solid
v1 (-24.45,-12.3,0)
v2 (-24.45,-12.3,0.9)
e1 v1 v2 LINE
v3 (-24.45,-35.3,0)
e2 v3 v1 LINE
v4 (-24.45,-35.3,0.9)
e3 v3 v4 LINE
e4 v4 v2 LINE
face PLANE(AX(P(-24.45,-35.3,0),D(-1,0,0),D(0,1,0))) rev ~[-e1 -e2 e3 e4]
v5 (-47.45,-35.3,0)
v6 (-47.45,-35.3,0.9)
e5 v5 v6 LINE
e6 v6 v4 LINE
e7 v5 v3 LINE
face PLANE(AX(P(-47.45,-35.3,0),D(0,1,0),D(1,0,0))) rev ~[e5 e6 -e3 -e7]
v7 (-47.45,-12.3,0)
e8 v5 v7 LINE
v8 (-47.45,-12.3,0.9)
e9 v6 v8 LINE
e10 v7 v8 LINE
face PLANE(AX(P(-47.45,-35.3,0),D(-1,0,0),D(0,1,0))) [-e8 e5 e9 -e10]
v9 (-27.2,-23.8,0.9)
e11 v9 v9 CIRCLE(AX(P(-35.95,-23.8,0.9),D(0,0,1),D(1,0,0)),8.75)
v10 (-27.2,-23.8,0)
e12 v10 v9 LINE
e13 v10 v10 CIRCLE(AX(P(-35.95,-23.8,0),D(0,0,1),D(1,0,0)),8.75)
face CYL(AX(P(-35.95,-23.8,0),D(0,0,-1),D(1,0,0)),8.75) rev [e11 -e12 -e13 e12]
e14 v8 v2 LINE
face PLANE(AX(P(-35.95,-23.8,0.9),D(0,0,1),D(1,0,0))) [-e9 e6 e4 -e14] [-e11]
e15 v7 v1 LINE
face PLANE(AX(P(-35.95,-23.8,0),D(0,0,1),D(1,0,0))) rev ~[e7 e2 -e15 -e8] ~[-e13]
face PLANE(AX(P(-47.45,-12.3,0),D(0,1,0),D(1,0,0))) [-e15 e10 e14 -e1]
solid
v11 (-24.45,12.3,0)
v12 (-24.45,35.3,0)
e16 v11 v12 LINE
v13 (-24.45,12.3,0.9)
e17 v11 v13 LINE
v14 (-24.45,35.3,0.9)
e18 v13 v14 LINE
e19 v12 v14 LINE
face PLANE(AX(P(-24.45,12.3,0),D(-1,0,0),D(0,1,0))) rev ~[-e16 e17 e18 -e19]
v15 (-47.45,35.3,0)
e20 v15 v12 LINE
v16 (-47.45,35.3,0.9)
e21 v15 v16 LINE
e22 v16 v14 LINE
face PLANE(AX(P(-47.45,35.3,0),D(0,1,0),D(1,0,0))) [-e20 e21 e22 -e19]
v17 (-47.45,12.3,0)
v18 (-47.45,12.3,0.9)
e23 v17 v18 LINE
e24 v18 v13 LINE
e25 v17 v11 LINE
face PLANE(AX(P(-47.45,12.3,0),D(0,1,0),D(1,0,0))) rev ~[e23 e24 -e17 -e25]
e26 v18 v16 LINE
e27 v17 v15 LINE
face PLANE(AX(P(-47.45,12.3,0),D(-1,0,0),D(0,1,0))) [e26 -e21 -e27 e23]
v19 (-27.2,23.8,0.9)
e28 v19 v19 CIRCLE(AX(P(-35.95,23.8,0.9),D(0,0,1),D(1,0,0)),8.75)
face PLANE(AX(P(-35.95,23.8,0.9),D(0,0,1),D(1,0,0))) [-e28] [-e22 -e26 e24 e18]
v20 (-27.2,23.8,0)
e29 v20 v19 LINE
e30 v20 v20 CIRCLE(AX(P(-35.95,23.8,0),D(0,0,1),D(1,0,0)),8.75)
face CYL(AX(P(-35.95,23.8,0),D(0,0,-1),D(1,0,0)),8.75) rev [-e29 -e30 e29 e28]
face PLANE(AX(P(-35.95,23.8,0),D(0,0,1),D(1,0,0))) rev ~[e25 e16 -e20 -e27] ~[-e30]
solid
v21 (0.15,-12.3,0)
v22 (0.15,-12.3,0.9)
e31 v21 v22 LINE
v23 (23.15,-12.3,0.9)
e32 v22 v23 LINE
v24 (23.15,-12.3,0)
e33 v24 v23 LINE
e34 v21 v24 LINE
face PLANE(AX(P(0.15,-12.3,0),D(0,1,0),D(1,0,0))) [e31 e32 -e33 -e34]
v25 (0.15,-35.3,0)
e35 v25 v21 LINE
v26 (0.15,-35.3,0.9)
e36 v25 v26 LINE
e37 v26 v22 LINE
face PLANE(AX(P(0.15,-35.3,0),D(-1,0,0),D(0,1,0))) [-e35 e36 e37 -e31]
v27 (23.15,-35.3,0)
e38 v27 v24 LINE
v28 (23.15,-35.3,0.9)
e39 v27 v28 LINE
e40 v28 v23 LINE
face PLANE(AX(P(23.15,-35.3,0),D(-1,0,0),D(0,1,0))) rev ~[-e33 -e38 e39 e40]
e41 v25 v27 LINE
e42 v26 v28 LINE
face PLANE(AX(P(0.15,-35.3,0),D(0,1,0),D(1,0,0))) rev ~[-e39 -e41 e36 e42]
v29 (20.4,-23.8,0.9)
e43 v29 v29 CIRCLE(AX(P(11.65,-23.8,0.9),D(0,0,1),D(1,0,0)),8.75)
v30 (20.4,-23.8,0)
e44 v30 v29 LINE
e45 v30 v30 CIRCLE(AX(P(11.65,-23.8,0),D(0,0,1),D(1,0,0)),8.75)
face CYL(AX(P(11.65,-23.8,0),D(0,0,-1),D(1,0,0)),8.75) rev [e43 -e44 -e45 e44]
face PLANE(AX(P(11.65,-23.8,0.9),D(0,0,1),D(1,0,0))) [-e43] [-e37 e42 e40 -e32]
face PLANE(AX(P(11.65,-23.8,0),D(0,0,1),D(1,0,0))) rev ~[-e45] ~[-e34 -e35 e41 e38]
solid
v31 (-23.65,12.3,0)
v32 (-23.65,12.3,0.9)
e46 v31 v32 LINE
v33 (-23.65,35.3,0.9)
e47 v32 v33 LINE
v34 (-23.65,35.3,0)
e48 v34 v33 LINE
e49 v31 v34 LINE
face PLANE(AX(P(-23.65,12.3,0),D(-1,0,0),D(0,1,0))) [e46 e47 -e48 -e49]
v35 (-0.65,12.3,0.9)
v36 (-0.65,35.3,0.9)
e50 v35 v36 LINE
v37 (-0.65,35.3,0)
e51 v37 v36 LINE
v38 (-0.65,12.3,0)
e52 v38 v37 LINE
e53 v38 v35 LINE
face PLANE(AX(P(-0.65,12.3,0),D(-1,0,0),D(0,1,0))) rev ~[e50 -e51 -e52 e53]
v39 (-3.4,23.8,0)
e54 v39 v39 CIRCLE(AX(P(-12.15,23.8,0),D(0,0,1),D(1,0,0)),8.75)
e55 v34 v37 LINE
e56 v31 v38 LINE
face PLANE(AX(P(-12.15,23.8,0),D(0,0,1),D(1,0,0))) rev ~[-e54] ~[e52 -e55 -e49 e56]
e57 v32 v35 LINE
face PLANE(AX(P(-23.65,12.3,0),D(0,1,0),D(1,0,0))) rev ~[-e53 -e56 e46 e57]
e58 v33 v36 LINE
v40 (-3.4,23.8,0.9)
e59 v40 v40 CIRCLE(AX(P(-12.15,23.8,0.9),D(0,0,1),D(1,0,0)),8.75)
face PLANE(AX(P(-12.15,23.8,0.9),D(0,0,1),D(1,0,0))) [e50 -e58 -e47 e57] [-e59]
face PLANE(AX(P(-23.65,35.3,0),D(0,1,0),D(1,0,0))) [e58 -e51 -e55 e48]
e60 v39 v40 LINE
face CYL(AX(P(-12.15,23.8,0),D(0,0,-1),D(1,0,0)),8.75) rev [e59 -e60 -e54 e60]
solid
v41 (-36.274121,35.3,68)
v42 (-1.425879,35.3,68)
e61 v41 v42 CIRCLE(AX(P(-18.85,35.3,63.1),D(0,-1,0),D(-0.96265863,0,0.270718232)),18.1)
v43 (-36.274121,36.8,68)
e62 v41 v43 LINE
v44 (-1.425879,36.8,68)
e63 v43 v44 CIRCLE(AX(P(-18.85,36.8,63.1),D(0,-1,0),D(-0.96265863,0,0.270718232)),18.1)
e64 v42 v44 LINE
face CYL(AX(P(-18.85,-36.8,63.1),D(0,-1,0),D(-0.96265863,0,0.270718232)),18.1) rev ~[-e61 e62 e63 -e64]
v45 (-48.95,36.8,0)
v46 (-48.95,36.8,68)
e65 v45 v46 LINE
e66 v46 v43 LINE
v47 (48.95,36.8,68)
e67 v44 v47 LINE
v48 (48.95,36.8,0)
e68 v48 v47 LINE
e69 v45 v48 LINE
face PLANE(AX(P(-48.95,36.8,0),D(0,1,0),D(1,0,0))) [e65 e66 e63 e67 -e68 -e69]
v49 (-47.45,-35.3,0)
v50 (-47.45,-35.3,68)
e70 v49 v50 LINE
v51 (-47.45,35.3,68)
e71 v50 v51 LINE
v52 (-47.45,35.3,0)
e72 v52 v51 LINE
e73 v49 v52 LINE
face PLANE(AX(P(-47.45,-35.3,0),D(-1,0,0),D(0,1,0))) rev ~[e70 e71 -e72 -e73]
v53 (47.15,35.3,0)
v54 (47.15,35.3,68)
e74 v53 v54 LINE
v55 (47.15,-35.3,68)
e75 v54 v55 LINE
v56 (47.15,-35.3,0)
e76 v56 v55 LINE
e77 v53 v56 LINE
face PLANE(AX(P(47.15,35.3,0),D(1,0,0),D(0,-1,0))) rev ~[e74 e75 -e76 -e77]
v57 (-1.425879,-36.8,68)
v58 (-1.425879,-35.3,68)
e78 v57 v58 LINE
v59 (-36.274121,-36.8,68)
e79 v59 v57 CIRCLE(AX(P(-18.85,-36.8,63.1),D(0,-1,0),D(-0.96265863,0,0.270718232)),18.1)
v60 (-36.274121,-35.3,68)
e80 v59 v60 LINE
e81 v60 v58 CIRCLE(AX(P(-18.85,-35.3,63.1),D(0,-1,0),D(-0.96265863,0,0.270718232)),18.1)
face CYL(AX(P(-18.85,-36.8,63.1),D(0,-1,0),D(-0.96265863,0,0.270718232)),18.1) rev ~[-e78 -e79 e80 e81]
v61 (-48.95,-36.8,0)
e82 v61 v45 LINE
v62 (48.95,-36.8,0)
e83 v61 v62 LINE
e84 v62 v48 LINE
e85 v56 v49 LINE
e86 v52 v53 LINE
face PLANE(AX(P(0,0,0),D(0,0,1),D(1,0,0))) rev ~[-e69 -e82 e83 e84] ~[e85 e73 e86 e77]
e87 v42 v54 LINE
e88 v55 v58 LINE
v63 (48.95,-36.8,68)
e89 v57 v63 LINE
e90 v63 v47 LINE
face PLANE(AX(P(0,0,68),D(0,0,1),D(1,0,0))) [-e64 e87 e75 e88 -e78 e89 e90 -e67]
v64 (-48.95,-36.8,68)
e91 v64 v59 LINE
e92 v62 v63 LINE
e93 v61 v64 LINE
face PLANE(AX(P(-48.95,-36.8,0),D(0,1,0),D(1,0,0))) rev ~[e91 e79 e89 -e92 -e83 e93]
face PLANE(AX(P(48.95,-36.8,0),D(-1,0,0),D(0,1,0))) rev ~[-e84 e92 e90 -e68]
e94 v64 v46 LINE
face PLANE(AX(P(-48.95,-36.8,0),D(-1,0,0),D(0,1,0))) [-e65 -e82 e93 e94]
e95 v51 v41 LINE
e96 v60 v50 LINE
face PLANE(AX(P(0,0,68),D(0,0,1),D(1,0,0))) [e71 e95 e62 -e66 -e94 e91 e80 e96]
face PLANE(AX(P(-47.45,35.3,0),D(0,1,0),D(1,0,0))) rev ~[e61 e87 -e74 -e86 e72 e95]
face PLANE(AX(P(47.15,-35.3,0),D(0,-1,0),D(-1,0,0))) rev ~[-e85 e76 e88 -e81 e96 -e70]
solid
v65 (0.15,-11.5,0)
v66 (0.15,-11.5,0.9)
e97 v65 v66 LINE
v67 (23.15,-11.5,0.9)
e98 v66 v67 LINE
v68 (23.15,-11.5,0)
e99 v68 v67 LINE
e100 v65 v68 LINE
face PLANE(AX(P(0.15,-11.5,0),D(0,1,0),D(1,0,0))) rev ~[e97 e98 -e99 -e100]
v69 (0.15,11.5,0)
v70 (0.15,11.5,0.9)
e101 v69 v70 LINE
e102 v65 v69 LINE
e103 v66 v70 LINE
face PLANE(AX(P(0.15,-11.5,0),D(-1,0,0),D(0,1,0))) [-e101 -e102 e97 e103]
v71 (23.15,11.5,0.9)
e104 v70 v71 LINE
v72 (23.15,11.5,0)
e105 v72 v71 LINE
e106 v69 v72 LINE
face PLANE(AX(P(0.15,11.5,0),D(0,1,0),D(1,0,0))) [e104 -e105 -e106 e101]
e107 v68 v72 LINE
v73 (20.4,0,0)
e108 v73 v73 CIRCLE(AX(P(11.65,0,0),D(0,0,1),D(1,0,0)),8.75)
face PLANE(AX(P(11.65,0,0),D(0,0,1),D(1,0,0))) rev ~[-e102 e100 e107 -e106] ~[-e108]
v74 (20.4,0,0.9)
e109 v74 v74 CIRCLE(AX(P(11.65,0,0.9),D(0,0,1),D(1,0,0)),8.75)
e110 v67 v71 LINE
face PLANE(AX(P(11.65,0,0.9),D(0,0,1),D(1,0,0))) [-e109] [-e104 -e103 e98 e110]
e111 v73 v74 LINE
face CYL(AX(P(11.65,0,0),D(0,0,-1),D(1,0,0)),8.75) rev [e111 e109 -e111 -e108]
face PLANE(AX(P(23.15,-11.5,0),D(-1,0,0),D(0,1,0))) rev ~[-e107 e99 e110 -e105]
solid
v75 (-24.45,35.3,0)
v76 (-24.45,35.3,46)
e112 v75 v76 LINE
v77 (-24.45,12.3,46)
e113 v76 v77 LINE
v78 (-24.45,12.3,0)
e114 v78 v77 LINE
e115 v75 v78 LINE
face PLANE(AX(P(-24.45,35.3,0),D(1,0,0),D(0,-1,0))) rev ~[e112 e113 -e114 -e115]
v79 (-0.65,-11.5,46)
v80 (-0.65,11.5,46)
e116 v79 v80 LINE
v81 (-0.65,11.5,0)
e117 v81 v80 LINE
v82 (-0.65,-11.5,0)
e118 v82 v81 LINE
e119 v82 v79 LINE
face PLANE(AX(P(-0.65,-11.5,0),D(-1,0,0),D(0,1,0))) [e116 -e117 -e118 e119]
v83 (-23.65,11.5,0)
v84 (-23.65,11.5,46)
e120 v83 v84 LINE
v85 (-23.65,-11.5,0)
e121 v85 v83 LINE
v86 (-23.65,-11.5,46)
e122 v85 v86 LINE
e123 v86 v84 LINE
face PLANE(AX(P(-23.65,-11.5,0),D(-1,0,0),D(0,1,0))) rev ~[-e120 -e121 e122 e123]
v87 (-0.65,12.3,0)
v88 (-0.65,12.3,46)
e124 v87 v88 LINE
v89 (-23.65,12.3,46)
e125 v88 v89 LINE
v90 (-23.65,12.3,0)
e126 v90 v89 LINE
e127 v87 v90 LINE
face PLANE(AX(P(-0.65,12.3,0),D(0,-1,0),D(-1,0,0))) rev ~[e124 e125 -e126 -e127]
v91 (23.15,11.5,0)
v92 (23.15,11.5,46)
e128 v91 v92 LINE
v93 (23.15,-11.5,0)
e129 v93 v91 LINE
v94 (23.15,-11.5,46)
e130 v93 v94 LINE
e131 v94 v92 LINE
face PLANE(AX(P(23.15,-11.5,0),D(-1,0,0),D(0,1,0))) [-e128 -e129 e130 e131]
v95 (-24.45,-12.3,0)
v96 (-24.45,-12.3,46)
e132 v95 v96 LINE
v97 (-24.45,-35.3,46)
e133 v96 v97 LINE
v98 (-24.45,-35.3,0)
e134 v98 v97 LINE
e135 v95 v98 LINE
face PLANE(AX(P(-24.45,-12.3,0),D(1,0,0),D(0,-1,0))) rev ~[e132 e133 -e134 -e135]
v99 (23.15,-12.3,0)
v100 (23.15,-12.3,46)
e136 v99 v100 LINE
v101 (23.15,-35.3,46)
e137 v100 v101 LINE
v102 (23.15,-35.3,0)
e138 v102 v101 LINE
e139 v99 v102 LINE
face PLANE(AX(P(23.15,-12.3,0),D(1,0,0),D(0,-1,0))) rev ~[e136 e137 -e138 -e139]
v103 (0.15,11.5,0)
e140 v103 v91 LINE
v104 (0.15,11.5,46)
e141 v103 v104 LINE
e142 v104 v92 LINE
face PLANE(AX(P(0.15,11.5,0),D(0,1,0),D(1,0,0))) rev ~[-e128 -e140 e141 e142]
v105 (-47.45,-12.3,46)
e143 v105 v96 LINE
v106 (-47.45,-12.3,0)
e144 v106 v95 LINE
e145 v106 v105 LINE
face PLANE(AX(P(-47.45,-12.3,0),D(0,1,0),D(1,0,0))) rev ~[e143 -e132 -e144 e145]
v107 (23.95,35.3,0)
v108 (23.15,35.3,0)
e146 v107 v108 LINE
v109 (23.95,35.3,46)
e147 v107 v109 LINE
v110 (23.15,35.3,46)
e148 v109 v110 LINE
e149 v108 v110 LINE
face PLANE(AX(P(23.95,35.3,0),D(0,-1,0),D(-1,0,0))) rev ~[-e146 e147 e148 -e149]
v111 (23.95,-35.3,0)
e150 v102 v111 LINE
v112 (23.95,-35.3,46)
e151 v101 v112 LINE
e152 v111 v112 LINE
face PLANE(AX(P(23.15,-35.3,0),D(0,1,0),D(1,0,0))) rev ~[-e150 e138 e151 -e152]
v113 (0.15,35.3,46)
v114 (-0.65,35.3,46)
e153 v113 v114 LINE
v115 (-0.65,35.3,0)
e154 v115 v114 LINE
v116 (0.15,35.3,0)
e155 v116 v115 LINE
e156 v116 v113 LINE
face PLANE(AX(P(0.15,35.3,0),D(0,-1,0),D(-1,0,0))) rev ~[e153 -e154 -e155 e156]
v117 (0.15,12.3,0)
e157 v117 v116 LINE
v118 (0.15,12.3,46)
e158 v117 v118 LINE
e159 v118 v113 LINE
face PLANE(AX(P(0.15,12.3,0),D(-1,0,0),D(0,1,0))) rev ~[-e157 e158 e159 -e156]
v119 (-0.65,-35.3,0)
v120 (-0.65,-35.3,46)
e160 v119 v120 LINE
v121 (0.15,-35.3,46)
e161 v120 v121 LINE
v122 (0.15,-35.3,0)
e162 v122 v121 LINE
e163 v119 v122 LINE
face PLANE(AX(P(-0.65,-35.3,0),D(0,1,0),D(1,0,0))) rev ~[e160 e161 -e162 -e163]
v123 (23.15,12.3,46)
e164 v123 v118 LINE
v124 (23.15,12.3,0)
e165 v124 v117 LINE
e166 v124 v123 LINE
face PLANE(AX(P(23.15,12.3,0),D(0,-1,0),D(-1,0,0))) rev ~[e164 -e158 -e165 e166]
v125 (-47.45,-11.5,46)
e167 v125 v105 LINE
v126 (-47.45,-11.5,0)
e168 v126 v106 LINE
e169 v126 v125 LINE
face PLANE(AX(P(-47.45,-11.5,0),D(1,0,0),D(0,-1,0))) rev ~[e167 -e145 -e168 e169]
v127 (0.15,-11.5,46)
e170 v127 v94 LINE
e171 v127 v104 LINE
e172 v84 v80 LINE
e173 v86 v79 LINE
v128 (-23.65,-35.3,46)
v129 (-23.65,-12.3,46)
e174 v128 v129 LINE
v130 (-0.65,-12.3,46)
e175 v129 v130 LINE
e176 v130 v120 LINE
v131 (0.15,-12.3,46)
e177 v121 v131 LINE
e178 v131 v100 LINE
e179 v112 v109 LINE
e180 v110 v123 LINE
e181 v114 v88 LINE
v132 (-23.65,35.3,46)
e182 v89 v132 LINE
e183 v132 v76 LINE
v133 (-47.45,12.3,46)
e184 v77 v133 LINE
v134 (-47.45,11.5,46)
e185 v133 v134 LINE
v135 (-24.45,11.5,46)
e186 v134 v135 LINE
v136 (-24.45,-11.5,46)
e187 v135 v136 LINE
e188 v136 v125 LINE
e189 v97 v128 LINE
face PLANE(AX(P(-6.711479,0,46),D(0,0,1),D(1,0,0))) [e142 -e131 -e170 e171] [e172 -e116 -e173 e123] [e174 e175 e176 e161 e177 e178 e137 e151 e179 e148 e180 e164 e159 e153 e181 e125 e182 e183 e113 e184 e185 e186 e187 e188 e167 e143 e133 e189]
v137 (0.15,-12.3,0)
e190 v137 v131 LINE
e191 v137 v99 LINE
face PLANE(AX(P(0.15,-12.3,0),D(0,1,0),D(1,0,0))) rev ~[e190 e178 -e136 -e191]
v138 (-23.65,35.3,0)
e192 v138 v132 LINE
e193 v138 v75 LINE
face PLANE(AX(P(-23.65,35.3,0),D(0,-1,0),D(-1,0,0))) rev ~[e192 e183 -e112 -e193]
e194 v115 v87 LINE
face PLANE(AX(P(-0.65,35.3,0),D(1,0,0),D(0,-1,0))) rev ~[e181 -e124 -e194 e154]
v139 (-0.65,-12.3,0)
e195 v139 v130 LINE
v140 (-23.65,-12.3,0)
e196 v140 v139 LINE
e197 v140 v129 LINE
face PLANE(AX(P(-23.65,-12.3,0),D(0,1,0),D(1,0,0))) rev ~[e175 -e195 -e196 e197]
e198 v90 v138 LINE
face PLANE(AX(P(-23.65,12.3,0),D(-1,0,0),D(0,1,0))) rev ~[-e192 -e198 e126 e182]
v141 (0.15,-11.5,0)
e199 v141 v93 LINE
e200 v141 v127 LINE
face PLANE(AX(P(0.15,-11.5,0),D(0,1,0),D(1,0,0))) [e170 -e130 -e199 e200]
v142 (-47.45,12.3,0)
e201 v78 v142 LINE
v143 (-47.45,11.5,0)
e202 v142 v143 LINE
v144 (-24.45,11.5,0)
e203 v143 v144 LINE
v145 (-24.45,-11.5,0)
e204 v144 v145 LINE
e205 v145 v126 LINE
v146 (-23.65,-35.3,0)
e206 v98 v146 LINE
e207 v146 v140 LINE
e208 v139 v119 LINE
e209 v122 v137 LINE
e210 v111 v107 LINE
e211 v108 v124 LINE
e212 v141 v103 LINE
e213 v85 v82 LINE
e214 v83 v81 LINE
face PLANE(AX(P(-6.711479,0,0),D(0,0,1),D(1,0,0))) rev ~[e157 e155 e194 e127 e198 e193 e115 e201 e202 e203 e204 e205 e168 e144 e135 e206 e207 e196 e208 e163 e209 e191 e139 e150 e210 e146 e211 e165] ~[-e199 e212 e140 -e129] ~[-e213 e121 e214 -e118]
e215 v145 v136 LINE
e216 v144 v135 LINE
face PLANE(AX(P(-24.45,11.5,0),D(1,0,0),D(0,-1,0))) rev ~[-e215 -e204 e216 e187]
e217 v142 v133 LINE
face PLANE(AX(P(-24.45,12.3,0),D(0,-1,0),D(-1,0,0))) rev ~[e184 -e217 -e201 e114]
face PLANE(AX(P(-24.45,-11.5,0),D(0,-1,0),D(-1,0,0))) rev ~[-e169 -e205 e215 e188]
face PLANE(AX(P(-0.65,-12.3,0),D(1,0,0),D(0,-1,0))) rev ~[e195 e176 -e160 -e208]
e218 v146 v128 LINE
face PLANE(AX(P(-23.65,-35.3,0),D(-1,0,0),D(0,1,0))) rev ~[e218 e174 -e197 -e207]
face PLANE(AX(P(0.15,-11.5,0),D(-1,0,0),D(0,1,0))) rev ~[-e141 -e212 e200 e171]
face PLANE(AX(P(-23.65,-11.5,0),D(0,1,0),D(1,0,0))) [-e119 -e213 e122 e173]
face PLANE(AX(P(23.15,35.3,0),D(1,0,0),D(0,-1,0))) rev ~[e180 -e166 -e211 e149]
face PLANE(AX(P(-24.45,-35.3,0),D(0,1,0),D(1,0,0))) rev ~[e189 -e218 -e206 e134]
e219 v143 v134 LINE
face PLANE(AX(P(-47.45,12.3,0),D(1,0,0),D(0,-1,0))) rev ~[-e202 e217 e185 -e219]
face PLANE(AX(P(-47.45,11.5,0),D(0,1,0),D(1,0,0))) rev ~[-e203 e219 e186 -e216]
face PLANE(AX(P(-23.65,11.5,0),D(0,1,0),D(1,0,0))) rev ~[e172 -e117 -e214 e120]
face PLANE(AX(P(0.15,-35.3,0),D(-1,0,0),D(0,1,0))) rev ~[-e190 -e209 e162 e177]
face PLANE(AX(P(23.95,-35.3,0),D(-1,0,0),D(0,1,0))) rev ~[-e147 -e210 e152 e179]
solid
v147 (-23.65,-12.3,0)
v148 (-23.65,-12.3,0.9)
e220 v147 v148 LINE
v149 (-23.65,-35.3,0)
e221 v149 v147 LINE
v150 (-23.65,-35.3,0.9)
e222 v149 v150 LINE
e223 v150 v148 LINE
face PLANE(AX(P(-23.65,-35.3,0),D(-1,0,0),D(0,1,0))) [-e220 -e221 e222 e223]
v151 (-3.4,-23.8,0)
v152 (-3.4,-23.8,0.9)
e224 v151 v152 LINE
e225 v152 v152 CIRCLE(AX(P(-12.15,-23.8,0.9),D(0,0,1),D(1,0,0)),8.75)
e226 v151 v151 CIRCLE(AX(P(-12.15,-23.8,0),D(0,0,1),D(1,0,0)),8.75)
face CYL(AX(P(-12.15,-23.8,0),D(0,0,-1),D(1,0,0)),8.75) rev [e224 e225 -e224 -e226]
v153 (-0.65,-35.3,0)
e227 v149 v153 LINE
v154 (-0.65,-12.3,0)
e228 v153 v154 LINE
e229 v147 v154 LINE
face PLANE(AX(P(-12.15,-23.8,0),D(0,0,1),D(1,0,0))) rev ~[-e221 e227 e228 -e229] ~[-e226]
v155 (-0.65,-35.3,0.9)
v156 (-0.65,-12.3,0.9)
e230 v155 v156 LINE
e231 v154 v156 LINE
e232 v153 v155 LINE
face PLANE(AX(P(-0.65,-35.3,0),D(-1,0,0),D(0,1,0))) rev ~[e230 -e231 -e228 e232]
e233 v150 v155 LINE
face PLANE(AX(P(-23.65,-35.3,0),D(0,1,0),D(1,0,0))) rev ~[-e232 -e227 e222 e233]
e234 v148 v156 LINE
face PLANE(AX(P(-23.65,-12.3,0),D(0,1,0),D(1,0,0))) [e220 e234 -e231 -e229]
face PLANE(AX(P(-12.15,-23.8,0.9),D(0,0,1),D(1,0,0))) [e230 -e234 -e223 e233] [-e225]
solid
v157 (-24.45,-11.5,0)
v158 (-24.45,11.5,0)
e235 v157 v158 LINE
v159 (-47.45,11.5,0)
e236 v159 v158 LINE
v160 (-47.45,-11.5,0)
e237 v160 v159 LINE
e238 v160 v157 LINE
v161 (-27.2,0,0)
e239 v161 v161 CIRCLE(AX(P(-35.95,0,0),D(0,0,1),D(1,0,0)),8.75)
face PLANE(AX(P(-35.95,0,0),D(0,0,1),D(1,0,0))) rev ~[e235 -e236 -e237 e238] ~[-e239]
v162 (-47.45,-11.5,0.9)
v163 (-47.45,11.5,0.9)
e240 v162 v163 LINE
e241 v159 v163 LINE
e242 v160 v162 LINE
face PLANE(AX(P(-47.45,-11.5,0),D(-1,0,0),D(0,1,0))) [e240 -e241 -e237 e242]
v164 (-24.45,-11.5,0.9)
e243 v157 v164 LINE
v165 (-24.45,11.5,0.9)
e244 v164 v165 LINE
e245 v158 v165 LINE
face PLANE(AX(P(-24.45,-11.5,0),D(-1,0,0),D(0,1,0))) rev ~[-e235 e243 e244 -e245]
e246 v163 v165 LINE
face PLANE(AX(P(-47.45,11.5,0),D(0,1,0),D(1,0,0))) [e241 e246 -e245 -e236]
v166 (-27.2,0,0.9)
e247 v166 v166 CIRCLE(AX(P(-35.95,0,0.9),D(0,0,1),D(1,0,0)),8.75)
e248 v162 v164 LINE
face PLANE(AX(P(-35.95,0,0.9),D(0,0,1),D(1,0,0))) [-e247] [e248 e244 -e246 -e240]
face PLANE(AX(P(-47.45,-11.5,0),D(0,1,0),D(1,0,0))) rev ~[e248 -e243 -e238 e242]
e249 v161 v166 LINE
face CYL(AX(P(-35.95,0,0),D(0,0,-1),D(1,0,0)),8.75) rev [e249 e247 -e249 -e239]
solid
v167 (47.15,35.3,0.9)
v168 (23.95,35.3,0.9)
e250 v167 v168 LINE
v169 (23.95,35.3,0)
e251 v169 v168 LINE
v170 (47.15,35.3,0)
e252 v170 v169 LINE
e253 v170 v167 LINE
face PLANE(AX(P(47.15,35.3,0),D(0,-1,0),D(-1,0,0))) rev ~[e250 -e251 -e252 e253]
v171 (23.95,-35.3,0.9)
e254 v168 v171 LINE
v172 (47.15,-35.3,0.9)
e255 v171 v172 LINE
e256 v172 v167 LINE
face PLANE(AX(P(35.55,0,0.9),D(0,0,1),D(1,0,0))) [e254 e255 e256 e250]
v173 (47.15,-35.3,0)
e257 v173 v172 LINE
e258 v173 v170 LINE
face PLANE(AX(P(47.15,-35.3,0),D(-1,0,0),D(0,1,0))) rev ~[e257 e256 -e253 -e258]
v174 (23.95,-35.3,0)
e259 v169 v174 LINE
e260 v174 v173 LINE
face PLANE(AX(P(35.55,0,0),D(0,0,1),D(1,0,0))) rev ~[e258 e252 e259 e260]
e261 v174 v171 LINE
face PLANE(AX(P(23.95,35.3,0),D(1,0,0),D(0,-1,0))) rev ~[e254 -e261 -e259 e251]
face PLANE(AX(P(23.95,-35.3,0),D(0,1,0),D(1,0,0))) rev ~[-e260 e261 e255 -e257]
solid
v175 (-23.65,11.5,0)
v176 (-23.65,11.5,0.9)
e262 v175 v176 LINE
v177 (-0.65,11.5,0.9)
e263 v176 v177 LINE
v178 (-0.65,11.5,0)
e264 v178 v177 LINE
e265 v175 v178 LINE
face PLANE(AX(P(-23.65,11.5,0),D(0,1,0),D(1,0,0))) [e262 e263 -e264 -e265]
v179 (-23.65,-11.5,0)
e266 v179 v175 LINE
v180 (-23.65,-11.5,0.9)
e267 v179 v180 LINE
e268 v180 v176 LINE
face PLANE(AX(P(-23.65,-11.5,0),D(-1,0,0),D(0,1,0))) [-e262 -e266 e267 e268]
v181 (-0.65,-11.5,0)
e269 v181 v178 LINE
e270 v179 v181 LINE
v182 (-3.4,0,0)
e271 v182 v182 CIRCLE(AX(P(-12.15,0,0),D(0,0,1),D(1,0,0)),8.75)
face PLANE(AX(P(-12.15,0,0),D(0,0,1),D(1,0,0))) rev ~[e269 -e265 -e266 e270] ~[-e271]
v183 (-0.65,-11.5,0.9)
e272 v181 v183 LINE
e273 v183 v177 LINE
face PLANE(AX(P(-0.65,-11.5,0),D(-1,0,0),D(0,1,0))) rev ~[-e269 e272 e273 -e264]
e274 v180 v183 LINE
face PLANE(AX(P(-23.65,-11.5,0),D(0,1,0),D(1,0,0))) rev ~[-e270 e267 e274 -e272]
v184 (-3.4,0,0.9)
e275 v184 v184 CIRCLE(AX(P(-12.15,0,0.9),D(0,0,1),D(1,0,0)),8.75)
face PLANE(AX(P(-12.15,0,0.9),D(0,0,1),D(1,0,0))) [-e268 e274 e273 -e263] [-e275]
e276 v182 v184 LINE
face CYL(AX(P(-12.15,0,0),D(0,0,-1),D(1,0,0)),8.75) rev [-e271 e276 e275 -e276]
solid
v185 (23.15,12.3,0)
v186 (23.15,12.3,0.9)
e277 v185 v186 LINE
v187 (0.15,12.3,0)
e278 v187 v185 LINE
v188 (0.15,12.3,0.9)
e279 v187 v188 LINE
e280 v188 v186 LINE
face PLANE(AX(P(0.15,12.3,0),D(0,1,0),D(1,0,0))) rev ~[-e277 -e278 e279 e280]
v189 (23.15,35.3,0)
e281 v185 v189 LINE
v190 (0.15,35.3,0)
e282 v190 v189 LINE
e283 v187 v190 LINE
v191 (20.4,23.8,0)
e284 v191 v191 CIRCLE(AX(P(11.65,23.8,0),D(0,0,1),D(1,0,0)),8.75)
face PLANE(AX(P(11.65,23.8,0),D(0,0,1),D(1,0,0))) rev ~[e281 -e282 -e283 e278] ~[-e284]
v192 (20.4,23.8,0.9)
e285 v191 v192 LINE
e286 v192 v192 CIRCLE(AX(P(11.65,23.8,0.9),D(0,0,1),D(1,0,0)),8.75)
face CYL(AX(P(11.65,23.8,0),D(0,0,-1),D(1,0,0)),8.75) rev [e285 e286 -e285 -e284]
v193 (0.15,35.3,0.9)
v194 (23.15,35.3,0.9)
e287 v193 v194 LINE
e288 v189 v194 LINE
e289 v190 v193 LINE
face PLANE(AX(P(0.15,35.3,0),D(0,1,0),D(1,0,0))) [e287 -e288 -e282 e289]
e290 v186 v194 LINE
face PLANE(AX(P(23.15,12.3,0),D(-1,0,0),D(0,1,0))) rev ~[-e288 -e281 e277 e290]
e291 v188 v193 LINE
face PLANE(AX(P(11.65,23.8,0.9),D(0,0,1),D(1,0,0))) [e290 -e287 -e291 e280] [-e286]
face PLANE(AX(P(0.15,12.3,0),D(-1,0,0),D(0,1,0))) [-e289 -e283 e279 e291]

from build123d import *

# Parameters (mm, degrees)
F0_W     = 23
F0_H     = 23
F0_R     = 8.75
F1_DEPTH = 0.9
F0_W_2   = 97.9
F0_H_2   = 73.6
F2_DEPTH = 68
F3_DEPTH = 46
F5_DEPTH = 100


# Not quite as in the source:
# - a feature names something its author has since deleted; it is built from what else it names


with BuildPart() as f1:
    # F0 (on Top) → F1 (new body)
    with BuildSketch(Plane.XY):
        with Locations((-35.95, 23.8)):
            Rectangle(F0_W, F0_H)
        with Locations((-35.95, 23.8)):
            Circle(F0_R, mode=Mode.SUBTRACT)
    extrude(amount=F1_DEPTH)


with BuildPart() as f1b:
    # F0 (on Top) → F1, piece 2 (new body)
    with BuildSketch(Plane.XY):
        with Locations((-12.15, 23.8)):
            Rectangle(F0_W, F0_H)
        with Locations((-12.15, 23.8)):
            Circle(F0_R, mode=Mode.SUBTRACT)
    extrude(amount=F1_DEPTH)


with BuildPart() as f1c:
    # F0 (on Top) → F1, piece 3 (new body)
    with BuildSketch(Plane.XY):
        with Locations((11.65, 23.8)):
            Rectangle(F0_W, F0_H)
        with Locations((11.65, 23.8)):
            Circle(F0_R, mode=Mode.SUBTRACT)
    extrude(amount=F1_DEPTH)


with BuildPart() as f1d:
    # F0 (on Top) → F1, piece 4 (new body)
    with BuildSketch(Plane.XY):
        Polygon((46.95, 35.3), (23.95, 35.3), (23.95, -35.3), (47.15, -35.3), (47.15, 35.3), align=None)
    extrude(amount=F1_DEPTH)


with BuildPart() as f1e:
    # F0 (on Top) → F1, piece 5 (new body)
    with BuildSketch(Plane.XY):
        with Locations((11.65, 0)):
            Rectangle(F0_W, F0_H)
        with Locations((11.65, 0)):
            Circle(F0_R, mode=Mode.SUBTRACT)
    extrude(amount=F1_DEPTH)


with BuildPart() as f1f:
    # F0 (on Top) → F1, piece 6 (new body)
    with BuildSketch(Plane.XY):
        with Locations((-12.15, 0)):
            Rectangle(F0_W, F0_H)
        with Locations((-12.15, 0)):
            Circle(F0_R, mode=Mode.SUBTRACT)
    extrude(amount=F1_DEPTH)


with BuildPart() as f1g:
    # F0 (on Top) → F1, piece 7 (new body)
    with BuildSketch(Plane.XY):
        with Locations((-35.95, 0)):
            Rectangle(F0_W, F0_H)
        with Locations((-35.95, 0)):
            Circle(F0_R, mode=Mode.SUBTRACT)
    extrude(amount=F1_DEPTH)


with BuildPart() as f1h:
    # F0 (on Top) → F1, piece 8 (new body)
    with BuildSketch(Plane.XY):
        with Locations((-35.95, -23.8)):
            Rectangle(F0_W, F0_H)
        with Locations((-35.95, -23.8)):
            Circle(F0_R, mode=Mode.SUBTRACT)
    extrude(amount=F1_DEPTH)


with BuildPart() as f1i:
    # F0 (on Top) → F1, piece 9 (new body)
    with BuildSketch(Plane.XY):
        with Locations((-12.15, -23.8)):
            Rectangle(F0_W, F0_H)
        with Locations((-12.15, -23.8)):
            Circle(F0_R, mode=Mode.SUBTRACT)
    extrude(amount=F1_DEPTH)


with BuildPart() as f1j:
    # F0 (on Top) → F1, piece 10 (new body)
    with BuildSketch(Plane.XY):
        with Locations((11.65, -23.8)):
            Rectangle(F0_W, F0_H)
        with Locations((11.65, -23.8)):
            Circle(F0_R, mode=Mode.SUBTRACT)
    extrude(amount=F1_DEPTH)


with BuildPart() as f2:
    # F0 (on Top) → F2 (new body)
    with BuildSketch(Plane.XY):
        Rectangle(F0_W_2, F0_H_2)
        Polygon((23.15, 35.3), (23.95, 35.3), (46.95, 35.3), (47.15, 35.3), (47.15, -35.3), (23.95, -35.3), (23.15, -35.3), (0.15, -35.3), (-0.65, -35.3), (-23.65, -35.3), (-24.45, -35.3), (-47.45, -35.3), (-47.45, -12.3), (-47.45, -11.5), (-47.45, 11.5), (-47.45, 12.3), (-47.45, 35.3), (-24.45, 35.3), (-23.65, 35.3), (-0.65, 35.3), (0.15, 35.3), align=None, mode=Mode.SUBTRACT)
    extrude(amount=F2_DEPTH)

    # F4 (on face) → F5 (cut)
    with BuildSketch(Plane.XZ.offset(36.8)):
        with BuildLine():
            Line((-1.4258787883, 68), (-36.2741212117, 68))
            ThreePointArc((-36.2741212117, 68), (-18.85, 45), (-1.4258787883, 68))
        make_face()
    extrude(amount=-F5_DEPTH, mode=Mode.SUBTRACT)


with BuildPart() as f3:
    # F0 (on Top) → F3 (new body)
    with BuildSketch(Plane.XY):
        Polygon((23.95, -35.3), (23.95, 35.3), (23.15, 35.3), (23.15, 12.3), (0.15, 12.3), (0.15, 35.3), (-0.65, 35.3), (-0.65, 12.3), (-23.65, 12.3), (-23.65, 35.3), (-24.45, 35.3), (-24.45, 12.3), (-47.45, 12.3), (-47.45, 11.5), (-24.45, 11.5), (-24.45, -11.5), (-47.45, -11.5), (-47.45, -12.3), (-24.45, -12.3), (-24.45, -35.3), (-23.65, -35.3), (-23.65, -12.3), (-0.65, -12.3), (-0.65, -35.3), (0.15, -35.3), (0.15, -12.3), (23.15, -12.3), (23.15, -35.3), align=None)
        with Locations((-12.15, 0)):
            Rectangle(F0_W, F0_H, mode=Mode.SUBTRACT)
        with Locations((11.65, 0)):
            Rectangle(F0_W, F0_H, mode=Mode.SUBTRACT)
    extrude(amount=F3_DEPTH)


solid = Compound([f1.part, f1b.part, f1c.part, f1d.part, f1e.part, f1f.part, f1g.part, f1h.part, f1i.part, f1j.part, f2.part, f3.part])
